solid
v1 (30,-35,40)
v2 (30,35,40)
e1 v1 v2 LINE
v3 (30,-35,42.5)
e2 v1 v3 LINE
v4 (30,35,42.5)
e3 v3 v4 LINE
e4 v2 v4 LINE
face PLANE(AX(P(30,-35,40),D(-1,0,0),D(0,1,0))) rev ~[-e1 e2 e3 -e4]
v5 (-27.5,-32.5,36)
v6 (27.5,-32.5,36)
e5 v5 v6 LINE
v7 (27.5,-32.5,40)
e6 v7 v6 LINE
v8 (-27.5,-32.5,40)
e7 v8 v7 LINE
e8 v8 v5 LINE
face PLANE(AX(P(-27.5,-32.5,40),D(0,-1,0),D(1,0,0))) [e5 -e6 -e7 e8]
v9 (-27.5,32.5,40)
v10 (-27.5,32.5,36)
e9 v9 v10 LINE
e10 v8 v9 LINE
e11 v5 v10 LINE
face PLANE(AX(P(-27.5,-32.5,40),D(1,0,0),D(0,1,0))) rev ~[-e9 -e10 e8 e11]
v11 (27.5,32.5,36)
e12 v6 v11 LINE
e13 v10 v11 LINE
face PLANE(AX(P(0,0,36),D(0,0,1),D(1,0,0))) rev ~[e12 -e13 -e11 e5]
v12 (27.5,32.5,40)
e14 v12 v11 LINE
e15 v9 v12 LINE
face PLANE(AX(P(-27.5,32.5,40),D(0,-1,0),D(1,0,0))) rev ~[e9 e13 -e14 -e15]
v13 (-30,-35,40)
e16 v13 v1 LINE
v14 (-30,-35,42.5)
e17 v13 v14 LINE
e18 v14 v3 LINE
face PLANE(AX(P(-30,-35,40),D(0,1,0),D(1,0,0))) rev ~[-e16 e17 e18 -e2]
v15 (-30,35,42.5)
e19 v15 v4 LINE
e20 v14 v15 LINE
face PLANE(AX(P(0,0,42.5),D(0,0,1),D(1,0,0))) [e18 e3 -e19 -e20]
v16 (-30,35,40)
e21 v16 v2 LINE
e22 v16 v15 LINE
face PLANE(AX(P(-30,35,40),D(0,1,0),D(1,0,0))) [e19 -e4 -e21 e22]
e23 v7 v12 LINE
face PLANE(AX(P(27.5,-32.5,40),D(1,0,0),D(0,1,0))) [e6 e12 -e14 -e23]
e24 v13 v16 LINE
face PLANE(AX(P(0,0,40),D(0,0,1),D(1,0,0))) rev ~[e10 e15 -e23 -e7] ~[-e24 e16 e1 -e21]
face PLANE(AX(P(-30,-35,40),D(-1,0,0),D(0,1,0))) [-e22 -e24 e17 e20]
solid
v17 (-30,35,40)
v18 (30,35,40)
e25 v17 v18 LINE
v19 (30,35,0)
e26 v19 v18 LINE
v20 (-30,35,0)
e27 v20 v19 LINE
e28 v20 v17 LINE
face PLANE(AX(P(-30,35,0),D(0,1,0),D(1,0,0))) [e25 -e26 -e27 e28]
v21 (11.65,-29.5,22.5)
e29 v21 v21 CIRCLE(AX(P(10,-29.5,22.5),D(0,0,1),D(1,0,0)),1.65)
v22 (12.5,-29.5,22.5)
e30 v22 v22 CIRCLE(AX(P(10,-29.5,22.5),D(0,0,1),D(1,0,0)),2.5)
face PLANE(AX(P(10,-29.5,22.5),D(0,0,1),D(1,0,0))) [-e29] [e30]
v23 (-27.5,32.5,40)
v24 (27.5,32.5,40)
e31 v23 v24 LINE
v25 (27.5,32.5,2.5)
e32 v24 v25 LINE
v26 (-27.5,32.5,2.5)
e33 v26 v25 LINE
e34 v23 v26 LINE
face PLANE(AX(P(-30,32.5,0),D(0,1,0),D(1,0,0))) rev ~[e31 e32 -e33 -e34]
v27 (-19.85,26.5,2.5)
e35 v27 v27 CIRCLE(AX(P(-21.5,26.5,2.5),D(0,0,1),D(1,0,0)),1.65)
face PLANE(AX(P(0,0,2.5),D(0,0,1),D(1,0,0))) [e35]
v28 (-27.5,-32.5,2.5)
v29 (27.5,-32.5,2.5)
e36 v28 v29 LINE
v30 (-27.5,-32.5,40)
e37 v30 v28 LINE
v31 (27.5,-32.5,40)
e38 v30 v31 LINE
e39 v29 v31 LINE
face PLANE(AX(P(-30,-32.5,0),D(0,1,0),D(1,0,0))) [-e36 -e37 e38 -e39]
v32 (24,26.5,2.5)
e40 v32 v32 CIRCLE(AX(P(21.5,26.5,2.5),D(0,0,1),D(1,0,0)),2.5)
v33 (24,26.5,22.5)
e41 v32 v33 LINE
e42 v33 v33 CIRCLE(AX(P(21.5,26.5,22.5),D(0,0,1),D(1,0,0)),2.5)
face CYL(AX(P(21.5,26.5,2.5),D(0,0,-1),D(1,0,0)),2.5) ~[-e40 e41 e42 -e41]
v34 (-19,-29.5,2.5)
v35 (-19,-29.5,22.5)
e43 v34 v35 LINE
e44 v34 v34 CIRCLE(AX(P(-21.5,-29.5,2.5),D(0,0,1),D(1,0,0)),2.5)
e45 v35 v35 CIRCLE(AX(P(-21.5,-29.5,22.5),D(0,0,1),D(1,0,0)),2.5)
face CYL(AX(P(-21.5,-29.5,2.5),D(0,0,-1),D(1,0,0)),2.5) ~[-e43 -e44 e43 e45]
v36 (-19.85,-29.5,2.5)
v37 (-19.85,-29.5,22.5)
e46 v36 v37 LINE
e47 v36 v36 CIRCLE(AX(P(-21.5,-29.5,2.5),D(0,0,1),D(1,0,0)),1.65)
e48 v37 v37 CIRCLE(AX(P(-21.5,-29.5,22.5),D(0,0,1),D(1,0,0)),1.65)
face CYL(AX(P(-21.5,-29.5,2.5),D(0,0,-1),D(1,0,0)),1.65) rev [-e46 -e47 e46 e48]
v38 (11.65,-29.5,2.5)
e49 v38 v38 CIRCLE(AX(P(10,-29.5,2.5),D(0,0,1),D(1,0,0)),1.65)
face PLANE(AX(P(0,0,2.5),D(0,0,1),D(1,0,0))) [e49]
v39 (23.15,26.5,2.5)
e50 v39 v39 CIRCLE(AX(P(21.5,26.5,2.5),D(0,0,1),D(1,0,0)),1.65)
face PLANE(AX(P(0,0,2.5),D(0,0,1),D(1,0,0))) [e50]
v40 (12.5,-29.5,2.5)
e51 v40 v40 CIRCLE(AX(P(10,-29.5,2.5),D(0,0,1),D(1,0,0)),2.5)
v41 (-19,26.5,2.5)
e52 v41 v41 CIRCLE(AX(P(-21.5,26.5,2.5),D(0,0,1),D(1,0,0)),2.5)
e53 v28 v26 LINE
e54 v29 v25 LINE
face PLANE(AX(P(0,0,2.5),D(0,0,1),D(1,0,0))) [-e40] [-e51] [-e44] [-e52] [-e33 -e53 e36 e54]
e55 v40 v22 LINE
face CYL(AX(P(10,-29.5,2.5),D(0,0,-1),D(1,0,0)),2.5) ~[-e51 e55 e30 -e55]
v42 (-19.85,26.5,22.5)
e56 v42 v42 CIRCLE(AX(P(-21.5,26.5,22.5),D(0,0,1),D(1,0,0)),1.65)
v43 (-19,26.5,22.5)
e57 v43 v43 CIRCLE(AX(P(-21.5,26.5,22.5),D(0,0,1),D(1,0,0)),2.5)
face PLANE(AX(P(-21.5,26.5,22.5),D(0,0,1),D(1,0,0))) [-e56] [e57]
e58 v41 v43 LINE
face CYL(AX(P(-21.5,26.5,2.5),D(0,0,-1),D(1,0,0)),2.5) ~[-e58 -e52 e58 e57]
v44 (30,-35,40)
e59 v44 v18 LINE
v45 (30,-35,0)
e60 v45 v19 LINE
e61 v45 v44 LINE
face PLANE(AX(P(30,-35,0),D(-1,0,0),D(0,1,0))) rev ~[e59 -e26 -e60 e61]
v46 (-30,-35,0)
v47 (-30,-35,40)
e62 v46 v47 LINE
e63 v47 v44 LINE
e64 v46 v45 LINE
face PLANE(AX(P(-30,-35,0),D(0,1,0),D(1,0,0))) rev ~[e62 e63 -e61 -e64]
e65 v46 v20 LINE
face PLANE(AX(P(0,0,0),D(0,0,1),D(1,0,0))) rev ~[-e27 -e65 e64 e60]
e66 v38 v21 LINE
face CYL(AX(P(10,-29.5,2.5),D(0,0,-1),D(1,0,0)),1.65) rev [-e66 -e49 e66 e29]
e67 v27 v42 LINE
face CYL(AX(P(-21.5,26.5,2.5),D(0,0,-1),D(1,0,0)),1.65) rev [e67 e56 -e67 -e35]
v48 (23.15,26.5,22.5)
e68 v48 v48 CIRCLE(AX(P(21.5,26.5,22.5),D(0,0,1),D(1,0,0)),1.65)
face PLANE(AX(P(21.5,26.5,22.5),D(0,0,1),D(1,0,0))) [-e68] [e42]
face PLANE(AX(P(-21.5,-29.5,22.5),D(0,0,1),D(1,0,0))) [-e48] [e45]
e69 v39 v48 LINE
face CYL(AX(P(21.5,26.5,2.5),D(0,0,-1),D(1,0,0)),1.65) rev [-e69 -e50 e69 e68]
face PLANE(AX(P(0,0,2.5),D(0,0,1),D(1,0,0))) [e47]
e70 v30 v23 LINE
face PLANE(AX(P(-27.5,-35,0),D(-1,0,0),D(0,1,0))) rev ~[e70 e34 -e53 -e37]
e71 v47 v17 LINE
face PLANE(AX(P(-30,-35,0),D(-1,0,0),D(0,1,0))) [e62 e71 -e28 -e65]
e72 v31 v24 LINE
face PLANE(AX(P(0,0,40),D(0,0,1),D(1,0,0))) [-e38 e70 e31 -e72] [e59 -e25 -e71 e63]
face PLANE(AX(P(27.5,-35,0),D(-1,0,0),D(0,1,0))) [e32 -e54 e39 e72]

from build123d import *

# Parameters (mm, degrees)
F0_W     = 60
F0_H     = 70
F1_DEPTH = 40
F2_T     = -2.5
F3_W     = 60
F3_H     = 70
F3_W_2   = 55
F3_H_2   = 65
F4_DEPTH = 2.5
F5_DEPTH = 4
F6_R     = 2.5
F6_R_2   = 1.65
F7_DEPTH = 20


with BuildPart() as f1:
    # F0 (on Top) → F1 (new body)
    with BuildSketch(Plane.XY):
        Rectangle(F0_W, F0_H)
    extrude(amount=F1_DEPTH)

    # F2
    f2_openings = [f1.faces().sort_by_distance(p)[0] for p in [
        (0, 0, 40),
    ]]
    offset(amount=F2_T, openings=f2_openings)

    # F6 (on face) → F7 (join)
    with BuildSketch(Plane.XY.offset(2.5)):
        with Locations((-21.5, 26.5)):
            Circle(F6_R)
        with Locations((-21.5, 26.5)):
            Circle(F6_R_2, mode=Mode.SUBTRACT)
        with Locations((21.5, 26.5)):
            Circle(F6_R)
        with Locations((21.5, 26.5)):
            Circle(F6_R_2, mode=Mode.SUBTRACT)
        with Locations((-21.5, -29.5)):
            Circle(F6_R)
        with Locations((-21.5, -29.5)):
            Circle(F6_R_2, mode=Mode.SUBTRACT)
        with Locations((10, -29.5)):
            Circle(F6_R)
        with Locations((10, -29.5)):
            Circle(F6_R_2, mode=Mode.SUBTRACT)
    extrude(amount=F7_DEPTH)


with BuildPart() as f4:
    # F3 (on face) → F4 (new body)
    with BuildSketch(Plane.XY.offset(40)):
        Rectangle(F3_W, F3_H)
        Rectangle(F3_W_2, F3_H_2, mode=Mode.SUBTRACT)
        Rectangle(F3_W_2, F3_H_2)
    extrude(amount=F4_DEPTH)

    # F3 (on face) → F5 (join)
    with BuildSketch(Plane.XY.offset(40)):
        Rectangle(F3_W_2, F3_H_2)
    extrude(amount=-F5_DEPTH)


solid = Compound([f1.part, f4.part])
